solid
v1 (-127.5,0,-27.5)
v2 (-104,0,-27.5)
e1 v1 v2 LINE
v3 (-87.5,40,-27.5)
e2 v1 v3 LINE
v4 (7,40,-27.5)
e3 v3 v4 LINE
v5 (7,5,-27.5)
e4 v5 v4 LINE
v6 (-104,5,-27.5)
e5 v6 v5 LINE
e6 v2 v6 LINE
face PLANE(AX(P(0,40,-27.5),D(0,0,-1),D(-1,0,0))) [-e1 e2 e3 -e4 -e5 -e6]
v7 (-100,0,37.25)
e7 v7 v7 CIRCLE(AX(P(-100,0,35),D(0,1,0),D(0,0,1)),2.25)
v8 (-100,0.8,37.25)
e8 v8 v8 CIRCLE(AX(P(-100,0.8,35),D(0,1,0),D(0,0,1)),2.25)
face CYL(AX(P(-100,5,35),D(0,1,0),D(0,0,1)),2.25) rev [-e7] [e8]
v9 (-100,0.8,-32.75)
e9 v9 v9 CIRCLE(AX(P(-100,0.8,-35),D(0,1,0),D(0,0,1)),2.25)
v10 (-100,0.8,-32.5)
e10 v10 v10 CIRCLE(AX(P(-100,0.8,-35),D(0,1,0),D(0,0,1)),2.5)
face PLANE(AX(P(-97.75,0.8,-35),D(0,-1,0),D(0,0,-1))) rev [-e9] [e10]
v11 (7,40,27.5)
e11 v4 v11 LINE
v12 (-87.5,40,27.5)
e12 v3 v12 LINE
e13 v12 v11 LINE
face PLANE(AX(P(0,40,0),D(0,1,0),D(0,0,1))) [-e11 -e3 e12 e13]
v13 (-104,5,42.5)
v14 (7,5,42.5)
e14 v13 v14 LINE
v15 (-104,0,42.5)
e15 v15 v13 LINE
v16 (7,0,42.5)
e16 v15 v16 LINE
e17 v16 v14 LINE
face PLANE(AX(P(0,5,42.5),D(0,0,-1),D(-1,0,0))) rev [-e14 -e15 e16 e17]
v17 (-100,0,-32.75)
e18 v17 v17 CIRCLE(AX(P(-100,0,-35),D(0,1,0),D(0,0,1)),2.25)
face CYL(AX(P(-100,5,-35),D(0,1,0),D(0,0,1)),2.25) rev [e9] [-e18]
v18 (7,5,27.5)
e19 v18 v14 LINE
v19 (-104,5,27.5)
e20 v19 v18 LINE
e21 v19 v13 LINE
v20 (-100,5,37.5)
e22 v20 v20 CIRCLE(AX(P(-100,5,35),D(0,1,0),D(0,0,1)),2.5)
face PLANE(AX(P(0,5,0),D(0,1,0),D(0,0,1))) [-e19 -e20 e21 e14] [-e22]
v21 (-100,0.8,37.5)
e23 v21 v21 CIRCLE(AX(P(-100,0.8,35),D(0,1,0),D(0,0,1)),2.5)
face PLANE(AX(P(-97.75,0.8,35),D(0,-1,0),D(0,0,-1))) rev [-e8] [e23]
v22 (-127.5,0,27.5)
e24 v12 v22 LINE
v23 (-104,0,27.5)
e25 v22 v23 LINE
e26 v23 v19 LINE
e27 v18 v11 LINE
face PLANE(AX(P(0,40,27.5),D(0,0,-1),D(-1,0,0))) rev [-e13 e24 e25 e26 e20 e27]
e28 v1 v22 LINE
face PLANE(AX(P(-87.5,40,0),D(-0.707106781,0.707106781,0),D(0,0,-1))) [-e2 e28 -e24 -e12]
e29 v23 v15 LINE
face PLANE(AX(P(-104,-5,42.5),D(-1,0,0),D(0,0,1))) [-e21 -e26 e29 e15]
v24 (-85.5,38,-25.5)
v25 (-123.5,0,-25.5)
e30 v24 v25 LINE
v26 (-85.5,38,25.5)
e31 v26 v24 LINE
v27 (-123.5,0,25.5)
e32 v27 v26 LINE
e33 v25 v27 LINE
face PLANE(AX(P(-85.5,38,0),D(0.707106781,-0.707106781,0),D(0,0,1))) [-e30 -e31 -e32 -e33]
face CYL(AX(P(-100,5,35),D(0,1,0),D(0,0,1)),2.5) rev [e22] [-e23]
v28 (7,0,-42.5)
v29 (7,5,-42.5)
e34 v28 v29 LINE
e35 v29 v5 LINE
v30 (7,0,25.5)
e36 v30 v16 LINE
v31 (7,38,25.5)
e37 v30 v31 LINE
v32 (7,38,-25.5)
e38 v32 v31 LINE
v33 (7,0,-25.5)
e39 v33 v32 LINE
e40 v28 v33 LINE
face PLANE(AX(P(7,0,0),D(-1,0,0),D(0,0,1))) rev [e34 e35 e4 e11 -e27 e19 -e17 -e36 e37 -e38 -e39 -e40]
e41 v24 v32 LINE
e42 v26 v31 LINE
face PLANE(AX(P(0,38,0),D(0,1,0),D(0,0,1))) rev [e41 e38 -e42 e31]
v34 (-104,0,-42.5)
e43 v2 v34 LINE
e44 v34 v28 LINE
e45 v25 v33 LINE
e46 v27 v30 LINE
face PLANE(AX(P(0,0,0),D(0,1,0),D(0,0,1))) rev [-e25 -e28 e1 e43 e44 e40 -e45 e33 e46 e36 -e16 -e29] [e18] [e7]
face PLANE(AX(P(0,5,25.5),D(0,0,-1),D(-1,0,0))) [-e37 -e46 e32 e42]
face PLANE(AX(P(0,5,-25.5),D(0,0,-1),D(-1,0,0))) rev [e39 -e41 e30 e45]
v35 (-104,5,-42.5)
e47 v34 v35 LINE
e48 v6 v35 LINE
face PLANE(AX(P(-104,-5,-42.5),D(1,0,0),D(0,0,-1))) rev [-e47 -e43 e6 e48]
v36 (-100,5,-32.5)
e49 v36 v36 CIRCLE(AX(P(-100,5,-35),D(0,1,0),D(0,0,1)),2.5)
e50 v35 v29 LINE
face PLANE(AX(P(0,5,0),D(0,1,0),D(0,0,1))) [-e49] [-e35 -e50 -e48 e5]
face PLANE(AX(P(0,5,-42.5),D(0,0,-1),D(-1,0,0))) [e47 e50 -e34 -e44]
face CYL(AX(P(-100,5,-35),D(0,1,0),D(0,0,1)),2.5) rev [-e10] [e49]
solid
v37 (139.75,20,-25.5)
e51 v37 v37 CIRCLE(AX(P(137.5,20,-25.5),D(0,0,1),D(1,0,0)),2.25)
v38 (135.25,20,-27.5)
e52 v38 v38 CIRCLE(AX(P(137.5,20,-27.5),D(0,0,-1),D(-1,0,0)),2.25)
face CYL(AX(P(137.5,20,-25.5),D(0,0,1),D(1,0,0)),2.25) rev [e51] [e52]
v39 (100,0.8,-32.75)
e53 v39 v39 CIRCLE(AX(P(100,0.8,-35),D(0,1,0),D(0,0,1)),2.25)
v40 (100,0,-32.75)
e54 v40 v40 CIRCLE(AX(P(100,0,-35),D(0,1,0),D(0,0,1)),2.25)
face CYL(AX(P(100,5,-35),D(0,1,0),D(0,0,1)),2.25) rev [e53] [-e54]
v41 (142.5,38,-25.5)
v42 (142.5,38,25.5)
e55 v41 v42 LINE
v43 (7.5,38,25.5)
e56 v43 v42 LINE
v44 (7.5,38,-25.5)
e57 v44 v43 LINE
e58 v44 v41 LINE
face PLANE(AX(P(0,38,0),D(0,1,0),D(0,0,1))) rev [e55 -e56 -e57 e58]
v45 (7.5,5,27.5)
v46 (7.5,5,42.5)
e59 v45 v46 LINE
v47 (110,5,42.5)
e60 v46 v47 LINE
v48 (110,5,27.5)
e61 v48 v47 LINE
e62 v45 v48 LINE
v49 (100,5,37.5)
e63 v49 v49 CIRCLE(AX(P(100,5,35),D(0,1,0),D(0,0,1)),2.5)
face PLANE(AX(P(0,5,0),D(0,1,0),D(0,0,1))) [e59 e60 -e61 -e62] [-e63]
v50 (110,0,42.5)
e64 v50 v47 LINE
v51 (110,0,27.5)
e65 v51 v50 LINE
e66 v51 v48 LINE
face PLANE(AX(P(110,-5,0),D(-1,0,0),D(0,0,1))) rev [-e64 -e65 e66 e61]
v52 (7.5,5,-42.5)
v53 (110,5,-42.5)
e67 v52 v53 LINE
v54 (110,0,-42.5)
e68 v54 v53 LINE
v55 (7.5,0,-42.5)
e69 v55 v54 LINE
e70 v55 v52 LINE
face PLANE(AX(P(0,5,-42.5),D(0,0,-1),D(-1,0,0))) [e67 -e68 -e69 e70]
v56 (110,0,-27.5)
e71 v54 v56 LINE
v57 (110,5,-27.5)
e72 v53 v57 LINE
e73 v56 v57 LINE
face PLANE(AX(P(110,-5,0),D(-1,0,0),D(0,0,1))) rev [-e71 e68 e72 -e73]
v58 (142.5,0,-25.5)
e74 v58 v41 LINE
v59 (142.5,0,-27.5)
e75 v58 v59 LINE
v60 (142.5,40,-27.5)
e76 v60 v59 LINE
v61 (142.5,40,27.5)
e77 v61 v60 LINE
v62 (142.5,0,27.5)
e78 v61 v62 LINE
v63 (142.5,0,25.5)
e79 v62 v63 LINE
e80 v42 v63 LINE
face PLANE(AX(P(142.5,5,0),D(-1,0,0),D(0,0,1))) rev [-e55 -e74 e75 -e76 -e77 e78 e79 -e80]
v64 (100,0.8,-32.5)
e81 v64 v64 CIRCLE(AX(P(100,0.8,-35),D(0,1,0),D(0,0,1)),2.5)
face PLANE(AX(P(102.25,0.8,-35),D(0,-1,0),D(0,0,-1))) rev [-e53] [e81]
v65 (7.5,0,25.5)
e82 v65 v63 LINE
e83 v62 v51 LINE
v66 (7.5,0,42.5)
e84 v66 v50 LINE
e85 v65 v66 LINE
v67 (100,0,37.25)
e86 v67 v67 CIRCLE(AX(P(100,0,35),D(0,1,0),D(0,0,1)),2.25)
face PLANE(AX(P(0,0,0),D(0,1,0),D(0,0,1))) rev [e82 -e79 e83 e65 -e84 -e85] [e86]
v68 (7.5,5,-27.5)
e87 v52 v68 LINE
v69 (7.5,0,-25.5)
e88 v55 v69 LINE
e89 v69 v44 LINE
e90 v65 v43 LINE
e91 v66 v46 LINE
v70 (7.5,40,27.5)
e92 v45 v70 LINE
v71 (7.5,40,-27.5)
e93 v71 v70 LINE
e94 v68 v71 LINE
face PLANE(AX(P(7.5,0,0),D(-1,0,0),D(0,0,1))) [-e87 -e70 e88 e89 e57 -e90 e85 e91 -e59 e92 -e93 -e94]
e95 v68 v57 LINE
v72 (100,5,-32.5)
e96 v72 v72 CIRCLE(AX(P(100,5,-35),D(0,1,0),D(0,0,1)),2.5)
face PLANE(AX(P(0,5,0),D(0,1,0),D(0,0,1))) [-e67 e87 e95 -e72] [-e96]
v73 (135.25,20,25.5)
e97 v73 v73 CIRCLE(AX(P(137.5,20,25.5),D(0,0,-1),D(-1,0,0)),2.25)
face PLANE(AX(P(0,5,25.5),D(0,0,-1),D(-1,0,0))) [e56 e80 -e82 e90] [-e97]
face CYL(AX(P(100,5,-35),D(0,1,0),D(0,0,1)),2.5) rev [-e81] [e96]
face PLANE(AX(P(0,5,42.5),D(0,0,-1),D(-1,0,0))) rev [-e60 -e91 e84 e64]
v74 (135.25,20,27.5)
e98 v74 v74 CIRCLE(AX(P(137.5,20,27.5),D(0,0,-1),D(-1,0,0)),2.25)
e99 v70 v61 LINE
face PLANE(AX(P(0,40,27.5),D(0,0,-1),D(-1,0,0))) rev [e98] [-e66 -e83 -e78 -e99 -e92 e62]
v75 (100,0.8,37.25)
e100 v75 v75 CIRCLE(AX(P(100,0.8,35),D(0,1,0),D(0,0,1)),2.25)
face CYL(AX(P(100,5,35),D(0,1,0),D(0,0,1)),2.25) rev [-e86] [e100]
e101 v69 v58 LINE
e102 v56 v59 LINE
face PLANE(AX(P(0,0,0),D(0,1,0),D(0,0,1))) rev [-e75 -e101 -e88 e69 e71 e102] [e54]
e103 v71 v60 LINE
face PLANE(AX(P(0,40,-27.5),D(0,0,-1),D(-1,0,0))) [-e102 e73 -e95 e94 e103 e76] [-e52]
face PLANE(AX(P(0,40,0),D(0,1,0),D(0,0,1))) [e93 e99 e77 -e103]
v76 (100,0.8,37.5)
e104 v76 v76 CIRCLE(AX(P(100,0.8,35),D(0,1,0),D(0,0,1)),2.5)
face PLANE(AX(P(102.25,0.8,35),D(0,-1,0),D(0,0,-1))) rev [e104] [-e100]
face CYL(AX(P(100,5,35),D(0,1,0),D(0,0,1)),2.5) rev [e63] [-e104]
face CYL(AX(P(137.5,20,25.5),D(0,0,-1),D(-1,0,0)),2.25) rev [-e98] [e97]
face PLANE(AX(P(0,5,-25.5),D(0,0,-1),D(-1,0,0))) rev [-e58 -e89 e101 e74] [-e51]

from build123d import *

# Parameters (mm, degrees)
SKETCH1_W                               = 270
SKETCH1_H                               = 85
SKETCH1_W_2                             = 251
SKETCH1_H_2                             = 51
BOSS_EXTRUDE1_DEPTH                     = 5
SKETCH2_W                               = 15
SKETCH2_H                               = 55
SKETCH2_W_2                             = 255
SKETCH2_W_3                             = 251
SKETCH2_H_2                             = 51
BOSS_EXTRUDE2_DEPTH                     = 35
SKETCH3_W                               = 270
SKETCH3_H                               = 55
BOSS_EXTRUDE3_DEPTH                     = 2
SKETCH4_W                               = 51
SKETCH4_H                               = 38
CUT_EXTRUDE1_DEPTH                      = 17
CBORE_FOR_M5_HEX_HEAD_BOLT1_D           = 4.5
CBORE_FOR_M5_HEX_HEAD_BOLT1_CBORE_D     = 5
CBORE_FOR_M5_HEX_HEAD_BOLT1_CBORE_DEPTH = 4.2
SKETCH8_W                               = 32.5
SKETCH8_H                               = 15
CUT_EXTRUDE2_DEPTH                      = 10
SKETCH9_W                               = 38.5
SKETCH9_H                               = 15
CUT_EXTRUDE3_DEPTH                      = 10
M4_CLEARANCE_HOLE1_D                    = 4.5
M4_CLEARANCE_HOLE1_DEPTH                = 17
CHAMFER1_SIZE                           = 40
SKETCH13_W                              = 93.197542006
SKETCH13_H                              = 99.683664526
CUT_EXTRUDE4_DEPTH                      = 0.5


with BuildPart() as part:
    # Sketch1 → Boss-Extrude1 (new body)
    with BuildSketch(Plane(origin=(0, 0, 0), x_dir=(1, 0, 0), z_dir=(0, 1, 0))):
        with Locations((7.5, 0)):
            Rectangle(SKETCH1_W, SKETCH1_H)
        Rectangle(SKETCH1_W_2, SKETCH1_H_2, mode=Mode.SUBTRACT)
    extrude(amount=BOSS_EXTRUDE1_DEPTH)

    # Sketch2 → Boss-Extrude2 (add)
    # profile 1 of 2: a face of its own
    with BuildSketch(Plane(origin=(0, 5, 0), x_dir=(1, 0, 0), z_dir=(0, 1, 0))):
        with Locations((135, 0)):
            Rectangle(SKETCH2_W, SKETCH2_H)
    # profile 2 of 2: a face of its own
    with BuildSketch(Plane(origin=(0, 5, 0), x_dir=(1, 0, 0), z_dir=(0, 1, 0))):
        Rectangle(SKETCH2_W_2, SKETCH2_H)
        Rectangle(SKETCH2_W_3, SKETCH2_H_2, mode=Mode.SUBTRACT)
    extrude(amount=BOSS_EXTRUDE2_DEPTH)

    # Sketch3 → Boss-Extrude3 (add)
    with BuildSketch(Plane(origin=(0, 40, 0), x_dir=(1, 0, 0), z_dir=(0, 1, 0))):
        with Locations((7.5, 0)):
            Rectangle(SKETCH3_W, SKETCH3_H)
    extrude(amount=-BOSS_EXTRUDE3_DEPTH)

    # Sketch4 → Cut-Extrude1 (cut)
    with BuildSketch(Plane(origin=(142.5, 0, 0), x_dir=(0, 0, -1), z_dir=(1, 0, 0))):
        with Locations((0, 19)):
            Rectangle(SKETCH4_W, SKETCH4_H)
    extrude(amount=-CUT_EXTRUDE1_DEPTH, mode=Mode.SUBTRACT)

    # CBORE for M5 Hex Head Bolt1 (through all)
    with Locations(Plane(origin=(0, 5, 0), x_dir=(1, 0, 0), z_dir=(0, 1, 0))):
        with Locations((100, 35), (-100, -35), (-100, 35), (100, -35)):
            CounterBoreHole(CBORE_FOR_M5_HEX_HEAD_BOLT1_D / 2, CBORE_FOR_M5_HEX_HEAD_BOLT1_CBORE_D / 2, CBORE_FOR_M5_HEX_HEAD_BOLT1_CBORE_DEPTH)

    # Sketch8 → Cut-Extrude2 (cut)
    with BuildSketch(Plane(origin=(0, 5, 0), x_dir=(1, 0, 0), z_dir=(0, 1, 0))):
        with Locations((126.25, 35)):
            Rectangle(SKETCH8_W, SKETCH8_H)
        with Locations((126.25, -35)):
            Rectangle(SKETCH8_W, SKETCH8_H)
    extrude(amount=-CUT_EXTRUDE2_DEPTH, mode=Mode.SUBTRACT)

    # Sketch9 → Cut-Extrude3 (cut)
    with BuildSketch(Plane(origin=(0, 5, 0), x_dir=(1, 0, 0), z_dir=(0, 1, 0))):
        with Locations((-123.25, 35)):
            Rectangle(SKETCH9_W, SKETCH9_H)
    cut_extrude3 = extrude(amount=-CUT_EXTRUDE3_DEPTH, mode=Mode.SUBTRACT)

    # Mirror1: Cut-Extrude3 across plane
    add(cut_extrude3.mirror(Plane.XY), mode=Mode.SUBTRACT)

    # M4 Clearance Hole1
    with Locations(Plane(origin=(0, 0, 25.5), x_dir=(-1, 0, 0), z_dir=(0, 0, -1))):
        with Locations((-137.5, 20)):
            m4_clearance_hole1 = Hole(M4_CLEARANCE_HOLE1_D / 2, depth=M4_CLEARANCE_HOLE1_DEPTH)

    # Mirror2: M4 Clearance Hole1 across plane
    add(m4_clearance_hole1.mirror(Plane.XY), mode=Mode.SUBTRACT)

    # Chamfer1
    # the kernel refuses this chamfer: 40 mm, written as the material it adds along each edge
    with BuildSketch(Plane(origin=(-125.5, 38, 25.5), x_dir=(-0.027495876610586317, -0.9996219169112968, 0), z_dir=(0, 0, -1))) as chamfer1_piece_1_section:
        Polygon((CHAMFER1_SIZE * 0.999621916911, -CHAMFER1_SIZE * 0.0274958766106), (-CHAMFER1_SIZE * 0.0274958766106, -CHAMFER1_SIZE * 0.999621916911), (0, 0), align=None)
    chamfer1_piece_1 = extrude(amount=51, mode=Mode.PRIVATE)
    chamfer1_piece_1 = split(chamfer1_piece_1, bisect_by=Plane(origin=(-112.198216197, 0, 0), z_dir=(0, 1, 0)), keep=Keep.TOP, mode=Mode.PRIVATE)
    add(chamfer1_piece_1)
    # the kernel refuses this chamfer: 40 mm, written as the material it takes off along each edge
    with BuildSketch(Plane(origin=(-127.5, 40, -130.367319519), x_dir=(-0.027495876610586317, -0.9996219169112968, 0), z_dir=(0, 0, 1))) as chamfer1_2_piece_1:
        Polygon((CHAMFER1_SIZE * 0.999621916911, CHAMFER1_SIZE * 0.0274958766106), (-CHAMFER1_SIZE * 0.0274958766106, CHAMFER1_SIZE * 0.999621916911), (0, 0), align=None)
    extrude(amount=260.734639037, mode=Mode.SUBTRACT)

    # Sketch13 → Cut-Extrude4 (cut)
    with BuildSketch(Plane(origin=(7.5, 0, 0), x_dir=(0, 0, -1), z_dir=(1, 0, 0))):
        Rectangle(SKETCH13_W, SKETCH13_H)
    extrude(amount=-CUT_EXTRUDE4_DEPTH, mode=Mode.SUBTRACT)


with BuildPart() as cut_extrude4_piece_1:
    # of the separate pieces the step leaves, piece 1, a body of its own (cut_extrude4_pieces)
    add(part.part.solids().sort_by_distance((-123.5, 0, 25.5))[0])


with BuildPart() as cut_extrude4_piece_2:
    # of the separate pieces the step leaves, piece 2, a body of its own (cut_extrude4_pieces)
    add(part.part.solids().sort_by_distance((7.5, 38, 25.5))[0])


solid = Compound([cut_extrude4_piece_1.part, cut_extrude4_piece_2.part])
